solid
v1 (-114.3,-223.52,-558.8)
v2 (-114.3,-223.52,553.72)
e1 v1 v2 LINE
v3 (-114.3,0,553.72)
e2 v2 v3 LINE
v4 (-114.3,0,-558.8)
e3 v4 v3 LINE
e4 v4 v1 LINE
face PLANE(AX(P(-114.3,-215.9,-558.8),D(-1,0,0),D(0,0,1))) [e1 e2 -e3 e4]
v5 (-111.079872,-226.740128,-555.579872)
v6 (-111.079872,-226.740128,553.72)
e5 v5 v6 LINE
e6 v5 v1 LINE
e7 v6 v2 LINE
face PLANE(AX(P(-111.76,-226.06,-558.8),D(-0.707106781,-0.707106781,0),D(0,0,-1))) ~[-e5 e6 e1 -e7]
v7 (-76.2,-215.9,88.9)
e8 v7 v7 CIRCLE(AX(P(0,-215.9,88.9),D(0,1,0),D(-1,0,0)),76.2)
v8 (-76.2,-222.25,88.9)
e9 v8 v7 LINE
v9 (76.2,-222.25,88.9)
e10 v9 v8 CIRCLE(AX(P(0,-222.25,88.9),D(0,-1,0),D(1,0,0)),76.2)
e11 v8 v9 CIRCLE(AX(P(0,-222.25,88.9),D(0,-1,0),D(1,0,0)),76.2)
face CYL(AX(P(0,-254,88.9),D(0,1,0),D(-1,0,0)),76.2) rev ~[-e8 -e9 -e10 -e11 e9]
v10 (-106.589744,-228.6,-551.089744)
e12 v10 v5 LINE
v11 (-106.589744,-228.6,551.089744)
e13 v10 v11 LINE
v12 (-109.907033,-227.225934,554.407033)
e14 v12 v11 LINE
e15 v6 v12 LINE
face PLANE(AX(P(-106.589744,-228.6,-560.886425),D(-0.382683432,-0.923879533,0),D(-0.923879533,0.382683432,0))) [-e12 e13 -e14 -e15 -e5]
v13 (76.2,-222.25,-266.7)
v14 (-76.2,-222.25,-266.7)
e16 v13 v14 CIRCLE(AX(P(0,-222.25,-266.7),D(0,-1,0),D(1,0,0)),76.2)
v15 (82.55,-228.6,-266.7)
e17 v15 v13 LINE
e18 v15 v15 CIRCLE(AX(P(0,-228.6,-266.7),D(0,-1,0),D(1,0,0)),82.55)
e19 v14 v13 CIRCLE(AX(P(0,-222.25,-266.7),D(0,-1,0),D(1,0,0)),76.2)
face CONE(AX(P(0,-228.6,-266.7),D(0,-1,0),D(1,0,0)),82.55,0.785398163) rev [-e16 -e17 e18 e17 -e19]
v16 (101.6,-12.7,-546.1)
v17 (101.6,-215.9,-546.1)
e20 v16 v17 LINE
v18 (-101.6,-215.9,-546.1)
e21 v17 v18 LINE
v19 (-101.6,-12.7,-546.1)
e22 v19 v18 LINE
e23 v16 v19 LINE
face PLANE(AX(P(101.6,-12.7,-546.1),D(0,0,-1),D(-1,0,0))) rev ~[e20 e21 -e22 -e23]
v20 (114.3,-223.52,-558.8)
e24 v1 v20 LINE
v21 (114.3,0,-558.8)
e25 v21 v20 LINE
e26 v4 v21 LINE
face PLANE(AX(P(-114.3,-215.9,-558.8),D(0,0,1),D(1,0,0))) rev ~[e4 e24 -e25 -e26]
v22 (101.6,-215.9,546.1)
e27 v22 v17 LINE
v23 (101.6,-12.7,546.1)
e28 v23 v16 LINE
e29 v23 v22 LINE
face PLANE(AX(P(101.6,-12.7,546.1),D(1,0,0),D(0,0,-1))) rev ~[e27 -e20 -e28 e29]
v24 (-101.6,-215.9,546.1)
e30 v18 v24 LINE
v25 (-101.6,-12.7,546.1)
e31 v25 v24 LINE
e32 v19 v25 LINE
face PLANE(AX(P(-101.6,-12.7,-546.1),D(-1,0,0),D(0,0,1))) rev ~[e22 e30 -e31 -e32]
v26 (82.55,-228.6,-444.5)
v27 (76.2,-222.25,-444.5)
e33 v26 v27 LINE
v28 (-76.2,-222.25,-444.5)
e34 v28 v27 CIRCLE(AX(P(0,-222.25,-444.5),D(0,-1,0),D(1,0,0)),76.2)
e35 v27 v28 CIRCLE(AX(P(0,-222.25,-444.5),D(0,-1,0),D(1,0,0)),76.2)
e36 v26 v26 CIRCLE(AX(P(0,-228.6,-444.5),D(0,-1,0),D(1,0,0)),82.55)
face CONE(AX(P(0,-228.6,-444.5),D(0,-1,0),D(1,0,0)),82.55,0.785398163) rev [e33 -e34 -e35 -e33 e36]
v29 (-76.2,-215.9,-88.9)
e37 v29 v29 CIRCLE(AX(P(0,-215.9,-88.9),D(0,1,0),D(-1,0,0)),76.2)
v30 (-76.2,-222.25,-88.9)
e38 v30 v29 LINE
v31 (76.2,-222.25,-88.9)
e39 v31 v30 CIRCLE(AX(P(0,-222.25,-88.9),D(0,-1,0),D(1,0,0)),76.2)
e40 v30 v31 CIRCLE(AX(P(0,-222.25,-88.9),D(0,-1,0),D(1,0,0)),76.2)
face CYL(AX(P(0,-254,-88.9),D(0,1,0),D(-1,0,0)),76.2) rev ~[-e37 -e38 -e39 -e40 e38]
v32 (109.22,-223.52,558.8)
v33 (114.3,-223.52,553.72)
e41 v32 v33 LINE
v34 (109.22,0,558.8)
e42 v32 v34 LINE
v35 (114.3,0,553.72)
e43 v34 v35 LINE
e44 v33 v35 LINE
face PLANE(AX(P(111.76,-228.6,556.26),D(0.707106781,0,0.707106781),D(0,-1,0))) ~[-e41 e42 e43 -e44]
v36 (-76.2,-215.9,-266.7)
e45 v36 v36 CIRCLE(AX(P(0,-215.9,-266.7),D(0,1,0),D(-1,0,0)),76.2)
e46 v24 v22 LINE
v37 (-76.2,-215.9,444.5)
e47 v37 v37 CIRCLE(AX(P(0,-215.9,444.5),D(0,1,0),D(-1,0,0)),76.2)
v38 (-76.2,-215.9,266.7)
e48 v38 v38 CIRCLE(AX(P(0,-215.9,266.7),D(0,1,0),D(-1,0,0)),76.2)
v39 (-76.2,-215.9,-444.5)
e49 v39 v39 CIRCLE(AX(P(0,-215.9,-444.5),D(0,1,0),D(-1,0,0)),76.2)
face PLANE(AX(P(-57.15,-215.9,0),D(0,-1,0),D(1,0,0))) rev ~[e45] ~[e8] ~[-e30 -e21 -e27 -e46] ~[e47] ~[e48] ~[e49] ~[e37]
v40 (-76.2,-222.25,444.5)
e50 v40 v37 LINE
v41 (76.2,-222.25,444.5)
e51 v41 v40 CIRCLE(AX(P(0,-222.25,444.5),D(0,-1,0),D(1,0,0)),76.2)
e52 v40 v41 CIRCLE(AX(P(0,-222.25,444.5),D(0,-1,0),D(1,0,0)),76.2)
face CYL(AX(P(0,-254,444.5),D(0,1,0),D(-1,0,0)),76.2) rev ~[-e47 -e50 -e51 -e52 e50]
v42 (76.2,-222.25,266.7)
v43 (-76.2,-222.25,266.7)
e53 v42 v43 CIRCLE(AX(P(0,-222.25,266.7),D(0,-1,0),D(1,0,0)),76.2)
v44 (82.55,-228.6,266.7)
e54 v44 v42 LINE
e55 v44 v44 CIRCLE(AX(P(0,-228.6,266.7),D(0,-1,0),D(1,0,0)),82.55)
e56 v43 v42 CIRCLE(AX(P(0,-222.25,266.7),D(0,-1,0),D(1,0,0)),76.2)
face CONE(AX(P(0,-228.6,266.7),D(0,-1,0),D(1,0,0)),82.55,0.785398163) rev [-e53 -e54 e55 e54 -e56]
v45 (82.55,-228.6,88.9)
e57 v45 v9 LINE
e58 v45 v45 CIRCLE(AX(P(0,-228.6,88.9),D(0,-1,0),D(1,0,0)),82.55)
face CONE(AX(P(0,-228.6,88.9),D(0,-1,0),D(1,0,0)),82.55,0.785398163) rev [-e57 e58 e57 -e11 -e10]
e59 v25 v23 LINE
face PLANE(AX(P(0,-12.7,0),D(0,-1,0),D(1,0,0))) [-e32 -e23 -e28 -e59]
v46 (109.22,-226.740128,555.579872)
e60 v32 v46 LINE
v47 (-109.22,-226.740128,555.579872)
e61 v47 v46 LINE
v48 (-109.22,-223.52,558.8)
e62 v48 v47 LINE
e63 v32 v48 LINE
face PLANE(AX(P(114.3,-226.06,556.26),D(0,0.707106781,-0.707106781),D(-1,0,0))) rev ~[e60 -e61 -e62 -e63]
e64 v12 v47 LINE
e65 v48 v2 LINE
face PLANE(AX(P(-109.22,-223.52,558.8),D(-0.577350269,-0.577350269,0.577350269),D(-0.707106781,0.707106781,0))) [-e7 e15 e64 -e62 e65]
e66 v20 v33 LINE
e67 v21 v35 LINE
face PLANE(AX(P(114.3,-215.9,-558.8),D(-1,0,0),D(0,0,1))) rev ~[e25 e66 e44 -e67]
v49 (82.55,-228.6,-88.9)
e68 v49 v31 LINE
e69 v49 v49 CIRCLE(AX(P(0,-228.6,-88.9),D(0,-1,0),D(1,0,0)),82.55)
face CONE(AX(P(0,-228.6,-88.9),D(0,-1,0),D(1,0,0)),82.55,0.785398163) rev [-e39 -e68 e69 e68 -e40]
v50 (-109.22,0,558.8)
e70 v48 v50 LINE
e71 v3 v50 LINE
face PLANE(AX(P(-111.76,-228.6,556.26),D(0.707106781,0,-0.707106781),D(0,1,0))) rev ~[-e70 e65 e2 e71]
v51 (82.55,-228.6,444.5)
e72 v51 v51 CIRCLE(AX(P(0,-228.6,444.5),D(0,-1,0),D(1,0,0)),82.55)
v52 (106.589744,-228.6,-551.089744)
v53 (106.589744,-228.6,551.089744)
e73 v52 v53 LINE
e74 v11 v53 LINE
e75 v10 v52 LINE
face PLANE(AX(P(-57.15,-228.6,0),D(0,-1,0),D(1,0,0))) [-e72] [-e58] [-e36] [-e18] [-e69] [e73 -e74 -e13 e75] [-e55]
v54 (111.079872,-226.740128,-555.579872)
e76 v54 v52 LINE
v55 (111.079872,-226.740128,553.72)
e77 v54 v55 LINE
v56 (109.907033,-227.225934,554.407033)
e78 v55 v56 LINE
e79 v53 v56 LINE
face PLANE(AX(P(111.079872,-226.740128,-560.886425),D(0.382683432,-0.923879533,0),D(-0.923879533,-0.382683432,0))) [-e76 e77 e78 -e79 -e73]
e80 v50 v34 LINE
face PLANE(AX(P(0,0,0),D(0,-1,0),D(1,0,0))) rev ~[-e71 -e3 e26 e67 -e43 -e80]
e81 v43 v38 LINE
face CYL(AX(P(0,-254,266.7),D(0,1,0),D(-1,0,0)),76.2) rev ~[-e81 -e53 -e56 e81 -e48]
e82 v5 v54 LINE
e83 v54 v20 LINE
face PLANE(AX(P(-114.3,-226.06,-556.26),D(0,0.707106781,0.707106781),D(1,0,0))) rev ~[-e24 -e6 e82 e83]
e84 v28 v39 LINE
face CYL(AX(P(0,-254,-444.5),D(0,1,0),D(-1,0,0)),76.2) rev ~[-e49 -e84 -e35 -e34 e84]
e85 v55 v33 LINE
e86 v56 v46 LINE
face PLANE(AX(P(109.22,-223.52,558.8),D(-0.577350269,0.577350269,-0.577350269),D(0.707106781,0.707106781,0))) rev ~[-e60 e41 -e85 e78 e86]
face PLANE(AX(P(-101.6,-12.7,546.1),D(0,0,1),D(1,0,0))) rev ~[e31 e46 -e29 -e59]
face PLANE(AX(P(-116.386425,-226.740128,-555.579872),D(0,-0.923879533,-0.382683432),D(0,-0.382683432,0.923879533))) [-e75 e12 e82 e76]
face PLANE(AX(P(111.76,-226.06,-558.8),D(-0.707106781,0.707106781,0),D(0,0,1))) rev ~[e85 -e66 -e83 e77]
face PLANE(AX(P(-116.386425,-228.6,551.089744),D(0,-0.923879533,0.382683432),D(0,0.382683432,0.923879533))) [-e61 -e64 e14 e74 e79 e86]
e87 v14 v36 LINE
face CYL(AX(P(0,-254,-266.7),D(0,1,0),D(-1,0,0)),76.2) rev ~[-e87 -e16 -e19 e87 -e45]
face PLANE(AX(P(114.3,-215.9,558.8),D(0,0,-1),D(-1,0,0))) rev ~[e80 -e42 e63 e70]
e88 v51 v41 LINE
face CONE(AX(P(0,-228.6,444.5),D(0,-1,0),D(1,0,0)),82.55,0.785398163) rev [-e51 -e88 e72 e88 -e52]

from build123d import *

# Parameters (mm, degrees)
F0_W        = 228.6
F0_H        = 1117.6
F1_DEPTH    = 12.7
F3_DEPTH    = 203.2
F4_W        = 114.3
F4_H        = 1117.6
F5_DEPTH    = 12.7
F7_D        = 152.4
F7_DEPTH    = 25.4
F7_TIP      = 45.7855791699
F8_SIZE     = 5.08
F9_T1_DEPTH = 232.7728499247
F9_T3_DEPTH = 1121.7728499247


# Not quite as in the source:
# - a fillet or chamfer that OpenCascade refuses, or shapes differently, is made with other operations: its cross-section is extruded or revolved along the edge and cut away or added


with BuildPart() as f1:
    # F0 (on Front) → F1 (new body)
    with BuildSketch(Plane.XZ):
        Rectangle(F0_W, F0_H)
    extrude(amount=F1_DEPTH)

    # F2 (on face) → F3 (join)
    with BuildSketch(Plane.XZ.offset(12.7)):
        Polygon((-101.6, 546.1), (-114.3, 558.8), (-114.3, -558.8), (-101.6, -546.1), align=None)
        Polygon((114.3, 558.8), (-114.3, 558.8), (-101.6, 546.1), (101.6, 546.1), align=None)
        Polygon((114.3, -558.8), (114.3, 558.8), (101.6, 546.1), (101.6, -546.1), align=None)
        Polygon((-101.6, -546.1), (-114.3, -558.8), (114.3, -558.8), (101.6, -546.1), align=None)
    extrude(amount=F3_DEPTH)

    # F4 (on face) → F5 (join)
    with BuildSketch(Plane.XZ.offset(215.9)):
        with Locations((-57.15, 0)):
            Rectangle(F4_W, F4_H)
        with Locations((57.15, 0)):
            Rectangle(F4_W, F4_H)
    extrude(amount=F5_DEPTH)

    # F7
    with Locations(Plane.XZ.offset(228.6)):
        with Locations((0, -444.5), (0, -266.7), (0, -88.9), (0, 88.9), (0, 266.7), (0, 444.5)):
            Hole(F7_D / 2, depth=F7_DEPTH)
            with Locations((0, 0, -(F7_DEPTH + F7_TIP / 2))):  # 118° drill point
                Cone(0, F7_D / 2, F7_TIP, mode=Mode.SUBTRACT)

    # F8
    f8_edges = [f1.edges().sort_by_distance(p)[0] for p in [
        (0, -228.6, -558.8),
        (114.3, -228.6, 0),
        (-114.3, -228.6, 0),
        (0, -228.6, 558.8),
        (-114.3, -114.3, 558.8),
        (114.3, -114.3, 558.8),
    ]]
    chamfer(f8_edges, length=F8_SIZE)

    # F9: chamfer of 6.35 on 10 edges, made by hand

    # F9_s2 → F9_t1 (cut)
    with BuildSketch(Plane.YZ.offset(-116.3864249623)):
        Polygon((-226.7401280605, -555.5798719395), (-228.6, -551.0897438789), (-228.6, -553.72), align=None)
        Polygon((-228.6, 551.0897438789), (-226.7401280605, 555.5798719395), (-228.6, 553.72), align=None)
    extrude(amount=F9_T1_DEPTH, mode=Mode.SUBTRACT)

    # F9_s4 → F9_t3 (cut)
    with BuildSketch(Plane.XY.offset(-560.8864249623)):
        Polygon((-106.5897438789, -228.6), (-111.0798719395, -226.7401280605), (-109.22, -228.6), align=None)
        Polygon((111.0798719395, -226.7401280605), (106.5897438789, -228.6), (109.22, -228.6), align=None)
    extrude(amount=F9_T3_DEPTH, mode=Mode.SUBTRACT)

    # F9_s5 → F9_t6 (revolve, cut)
    with BuildSketch(Plane.XY.offset(-444.5)):
        Polygon((82.55, -228.6), (76.2, -222.25), (76.2, -228.6), align=None)
    revolve(axis=Axis((0, -228.6, -444.5), (0, -1, 0)), mode=Mode.SUBTRACT)

    # F9_s7 → F9_t8 (revolve, cut)
    with BuildSketch(Plane.XY.offset(-266.7)):
        Polygon((82.55, -228.6), (76.2, -222.25), (76.2, -228.6), align=None)
    revolve(axis=Axis((0, -228.6, -266.7), (0, -1, 0)), mode=Mode.SUBTRACT)

    # F9_s9 → F9_t10 (revolve, cut)
    with BuildSketch(Plane.XY.offset(-88.9)):
        Polygon((82.55, -228.6), (76.2, -222.25), (76.2, -228.6), align=None)
    revolve(axis=Axis((0, -228.6, -88.9), (0, -1, 0)), mode=Mode.SUBTRACT)

    # F9_s11 → F9_t12 (revolve, cut)
    with BuildSketch(Plane.XY.offset(88.9)):
        Polygon((82.55, -228.6), (76.2, -222.25), (76.2, -228.6), align=None)
    revolve(axis=Axis((0, -228.6, 88.9), (0, -1, 0)), mode=Mode.SUBTRACT)

    # F9_s13 → F9_t14 (revolve, cut)
    with BuildSketch(Plane.XY.offset(266.7)):
        Polygon((82.55, -228.6), (76.2, -222.25), (76.2, -228.6), align=None)
    revolve(axis=Axis((0, -228.6, 266.7), (0, -1, 0)), mode=Mode.SUBTRACT)

    # F9_s15 → F9_t16 (revolve, cut)
    with BuildSketch(Plane.XY.offset(444.5)):
        Polygon((82.55, -228.6), (76.2, -222.25), (76.2, -228.6), align=None)
    revolve(axis=Axis((0, -228.6, 444.5), (0, -1, 0)), mode=Mode.SUBTRACT)


solid = f1.part
